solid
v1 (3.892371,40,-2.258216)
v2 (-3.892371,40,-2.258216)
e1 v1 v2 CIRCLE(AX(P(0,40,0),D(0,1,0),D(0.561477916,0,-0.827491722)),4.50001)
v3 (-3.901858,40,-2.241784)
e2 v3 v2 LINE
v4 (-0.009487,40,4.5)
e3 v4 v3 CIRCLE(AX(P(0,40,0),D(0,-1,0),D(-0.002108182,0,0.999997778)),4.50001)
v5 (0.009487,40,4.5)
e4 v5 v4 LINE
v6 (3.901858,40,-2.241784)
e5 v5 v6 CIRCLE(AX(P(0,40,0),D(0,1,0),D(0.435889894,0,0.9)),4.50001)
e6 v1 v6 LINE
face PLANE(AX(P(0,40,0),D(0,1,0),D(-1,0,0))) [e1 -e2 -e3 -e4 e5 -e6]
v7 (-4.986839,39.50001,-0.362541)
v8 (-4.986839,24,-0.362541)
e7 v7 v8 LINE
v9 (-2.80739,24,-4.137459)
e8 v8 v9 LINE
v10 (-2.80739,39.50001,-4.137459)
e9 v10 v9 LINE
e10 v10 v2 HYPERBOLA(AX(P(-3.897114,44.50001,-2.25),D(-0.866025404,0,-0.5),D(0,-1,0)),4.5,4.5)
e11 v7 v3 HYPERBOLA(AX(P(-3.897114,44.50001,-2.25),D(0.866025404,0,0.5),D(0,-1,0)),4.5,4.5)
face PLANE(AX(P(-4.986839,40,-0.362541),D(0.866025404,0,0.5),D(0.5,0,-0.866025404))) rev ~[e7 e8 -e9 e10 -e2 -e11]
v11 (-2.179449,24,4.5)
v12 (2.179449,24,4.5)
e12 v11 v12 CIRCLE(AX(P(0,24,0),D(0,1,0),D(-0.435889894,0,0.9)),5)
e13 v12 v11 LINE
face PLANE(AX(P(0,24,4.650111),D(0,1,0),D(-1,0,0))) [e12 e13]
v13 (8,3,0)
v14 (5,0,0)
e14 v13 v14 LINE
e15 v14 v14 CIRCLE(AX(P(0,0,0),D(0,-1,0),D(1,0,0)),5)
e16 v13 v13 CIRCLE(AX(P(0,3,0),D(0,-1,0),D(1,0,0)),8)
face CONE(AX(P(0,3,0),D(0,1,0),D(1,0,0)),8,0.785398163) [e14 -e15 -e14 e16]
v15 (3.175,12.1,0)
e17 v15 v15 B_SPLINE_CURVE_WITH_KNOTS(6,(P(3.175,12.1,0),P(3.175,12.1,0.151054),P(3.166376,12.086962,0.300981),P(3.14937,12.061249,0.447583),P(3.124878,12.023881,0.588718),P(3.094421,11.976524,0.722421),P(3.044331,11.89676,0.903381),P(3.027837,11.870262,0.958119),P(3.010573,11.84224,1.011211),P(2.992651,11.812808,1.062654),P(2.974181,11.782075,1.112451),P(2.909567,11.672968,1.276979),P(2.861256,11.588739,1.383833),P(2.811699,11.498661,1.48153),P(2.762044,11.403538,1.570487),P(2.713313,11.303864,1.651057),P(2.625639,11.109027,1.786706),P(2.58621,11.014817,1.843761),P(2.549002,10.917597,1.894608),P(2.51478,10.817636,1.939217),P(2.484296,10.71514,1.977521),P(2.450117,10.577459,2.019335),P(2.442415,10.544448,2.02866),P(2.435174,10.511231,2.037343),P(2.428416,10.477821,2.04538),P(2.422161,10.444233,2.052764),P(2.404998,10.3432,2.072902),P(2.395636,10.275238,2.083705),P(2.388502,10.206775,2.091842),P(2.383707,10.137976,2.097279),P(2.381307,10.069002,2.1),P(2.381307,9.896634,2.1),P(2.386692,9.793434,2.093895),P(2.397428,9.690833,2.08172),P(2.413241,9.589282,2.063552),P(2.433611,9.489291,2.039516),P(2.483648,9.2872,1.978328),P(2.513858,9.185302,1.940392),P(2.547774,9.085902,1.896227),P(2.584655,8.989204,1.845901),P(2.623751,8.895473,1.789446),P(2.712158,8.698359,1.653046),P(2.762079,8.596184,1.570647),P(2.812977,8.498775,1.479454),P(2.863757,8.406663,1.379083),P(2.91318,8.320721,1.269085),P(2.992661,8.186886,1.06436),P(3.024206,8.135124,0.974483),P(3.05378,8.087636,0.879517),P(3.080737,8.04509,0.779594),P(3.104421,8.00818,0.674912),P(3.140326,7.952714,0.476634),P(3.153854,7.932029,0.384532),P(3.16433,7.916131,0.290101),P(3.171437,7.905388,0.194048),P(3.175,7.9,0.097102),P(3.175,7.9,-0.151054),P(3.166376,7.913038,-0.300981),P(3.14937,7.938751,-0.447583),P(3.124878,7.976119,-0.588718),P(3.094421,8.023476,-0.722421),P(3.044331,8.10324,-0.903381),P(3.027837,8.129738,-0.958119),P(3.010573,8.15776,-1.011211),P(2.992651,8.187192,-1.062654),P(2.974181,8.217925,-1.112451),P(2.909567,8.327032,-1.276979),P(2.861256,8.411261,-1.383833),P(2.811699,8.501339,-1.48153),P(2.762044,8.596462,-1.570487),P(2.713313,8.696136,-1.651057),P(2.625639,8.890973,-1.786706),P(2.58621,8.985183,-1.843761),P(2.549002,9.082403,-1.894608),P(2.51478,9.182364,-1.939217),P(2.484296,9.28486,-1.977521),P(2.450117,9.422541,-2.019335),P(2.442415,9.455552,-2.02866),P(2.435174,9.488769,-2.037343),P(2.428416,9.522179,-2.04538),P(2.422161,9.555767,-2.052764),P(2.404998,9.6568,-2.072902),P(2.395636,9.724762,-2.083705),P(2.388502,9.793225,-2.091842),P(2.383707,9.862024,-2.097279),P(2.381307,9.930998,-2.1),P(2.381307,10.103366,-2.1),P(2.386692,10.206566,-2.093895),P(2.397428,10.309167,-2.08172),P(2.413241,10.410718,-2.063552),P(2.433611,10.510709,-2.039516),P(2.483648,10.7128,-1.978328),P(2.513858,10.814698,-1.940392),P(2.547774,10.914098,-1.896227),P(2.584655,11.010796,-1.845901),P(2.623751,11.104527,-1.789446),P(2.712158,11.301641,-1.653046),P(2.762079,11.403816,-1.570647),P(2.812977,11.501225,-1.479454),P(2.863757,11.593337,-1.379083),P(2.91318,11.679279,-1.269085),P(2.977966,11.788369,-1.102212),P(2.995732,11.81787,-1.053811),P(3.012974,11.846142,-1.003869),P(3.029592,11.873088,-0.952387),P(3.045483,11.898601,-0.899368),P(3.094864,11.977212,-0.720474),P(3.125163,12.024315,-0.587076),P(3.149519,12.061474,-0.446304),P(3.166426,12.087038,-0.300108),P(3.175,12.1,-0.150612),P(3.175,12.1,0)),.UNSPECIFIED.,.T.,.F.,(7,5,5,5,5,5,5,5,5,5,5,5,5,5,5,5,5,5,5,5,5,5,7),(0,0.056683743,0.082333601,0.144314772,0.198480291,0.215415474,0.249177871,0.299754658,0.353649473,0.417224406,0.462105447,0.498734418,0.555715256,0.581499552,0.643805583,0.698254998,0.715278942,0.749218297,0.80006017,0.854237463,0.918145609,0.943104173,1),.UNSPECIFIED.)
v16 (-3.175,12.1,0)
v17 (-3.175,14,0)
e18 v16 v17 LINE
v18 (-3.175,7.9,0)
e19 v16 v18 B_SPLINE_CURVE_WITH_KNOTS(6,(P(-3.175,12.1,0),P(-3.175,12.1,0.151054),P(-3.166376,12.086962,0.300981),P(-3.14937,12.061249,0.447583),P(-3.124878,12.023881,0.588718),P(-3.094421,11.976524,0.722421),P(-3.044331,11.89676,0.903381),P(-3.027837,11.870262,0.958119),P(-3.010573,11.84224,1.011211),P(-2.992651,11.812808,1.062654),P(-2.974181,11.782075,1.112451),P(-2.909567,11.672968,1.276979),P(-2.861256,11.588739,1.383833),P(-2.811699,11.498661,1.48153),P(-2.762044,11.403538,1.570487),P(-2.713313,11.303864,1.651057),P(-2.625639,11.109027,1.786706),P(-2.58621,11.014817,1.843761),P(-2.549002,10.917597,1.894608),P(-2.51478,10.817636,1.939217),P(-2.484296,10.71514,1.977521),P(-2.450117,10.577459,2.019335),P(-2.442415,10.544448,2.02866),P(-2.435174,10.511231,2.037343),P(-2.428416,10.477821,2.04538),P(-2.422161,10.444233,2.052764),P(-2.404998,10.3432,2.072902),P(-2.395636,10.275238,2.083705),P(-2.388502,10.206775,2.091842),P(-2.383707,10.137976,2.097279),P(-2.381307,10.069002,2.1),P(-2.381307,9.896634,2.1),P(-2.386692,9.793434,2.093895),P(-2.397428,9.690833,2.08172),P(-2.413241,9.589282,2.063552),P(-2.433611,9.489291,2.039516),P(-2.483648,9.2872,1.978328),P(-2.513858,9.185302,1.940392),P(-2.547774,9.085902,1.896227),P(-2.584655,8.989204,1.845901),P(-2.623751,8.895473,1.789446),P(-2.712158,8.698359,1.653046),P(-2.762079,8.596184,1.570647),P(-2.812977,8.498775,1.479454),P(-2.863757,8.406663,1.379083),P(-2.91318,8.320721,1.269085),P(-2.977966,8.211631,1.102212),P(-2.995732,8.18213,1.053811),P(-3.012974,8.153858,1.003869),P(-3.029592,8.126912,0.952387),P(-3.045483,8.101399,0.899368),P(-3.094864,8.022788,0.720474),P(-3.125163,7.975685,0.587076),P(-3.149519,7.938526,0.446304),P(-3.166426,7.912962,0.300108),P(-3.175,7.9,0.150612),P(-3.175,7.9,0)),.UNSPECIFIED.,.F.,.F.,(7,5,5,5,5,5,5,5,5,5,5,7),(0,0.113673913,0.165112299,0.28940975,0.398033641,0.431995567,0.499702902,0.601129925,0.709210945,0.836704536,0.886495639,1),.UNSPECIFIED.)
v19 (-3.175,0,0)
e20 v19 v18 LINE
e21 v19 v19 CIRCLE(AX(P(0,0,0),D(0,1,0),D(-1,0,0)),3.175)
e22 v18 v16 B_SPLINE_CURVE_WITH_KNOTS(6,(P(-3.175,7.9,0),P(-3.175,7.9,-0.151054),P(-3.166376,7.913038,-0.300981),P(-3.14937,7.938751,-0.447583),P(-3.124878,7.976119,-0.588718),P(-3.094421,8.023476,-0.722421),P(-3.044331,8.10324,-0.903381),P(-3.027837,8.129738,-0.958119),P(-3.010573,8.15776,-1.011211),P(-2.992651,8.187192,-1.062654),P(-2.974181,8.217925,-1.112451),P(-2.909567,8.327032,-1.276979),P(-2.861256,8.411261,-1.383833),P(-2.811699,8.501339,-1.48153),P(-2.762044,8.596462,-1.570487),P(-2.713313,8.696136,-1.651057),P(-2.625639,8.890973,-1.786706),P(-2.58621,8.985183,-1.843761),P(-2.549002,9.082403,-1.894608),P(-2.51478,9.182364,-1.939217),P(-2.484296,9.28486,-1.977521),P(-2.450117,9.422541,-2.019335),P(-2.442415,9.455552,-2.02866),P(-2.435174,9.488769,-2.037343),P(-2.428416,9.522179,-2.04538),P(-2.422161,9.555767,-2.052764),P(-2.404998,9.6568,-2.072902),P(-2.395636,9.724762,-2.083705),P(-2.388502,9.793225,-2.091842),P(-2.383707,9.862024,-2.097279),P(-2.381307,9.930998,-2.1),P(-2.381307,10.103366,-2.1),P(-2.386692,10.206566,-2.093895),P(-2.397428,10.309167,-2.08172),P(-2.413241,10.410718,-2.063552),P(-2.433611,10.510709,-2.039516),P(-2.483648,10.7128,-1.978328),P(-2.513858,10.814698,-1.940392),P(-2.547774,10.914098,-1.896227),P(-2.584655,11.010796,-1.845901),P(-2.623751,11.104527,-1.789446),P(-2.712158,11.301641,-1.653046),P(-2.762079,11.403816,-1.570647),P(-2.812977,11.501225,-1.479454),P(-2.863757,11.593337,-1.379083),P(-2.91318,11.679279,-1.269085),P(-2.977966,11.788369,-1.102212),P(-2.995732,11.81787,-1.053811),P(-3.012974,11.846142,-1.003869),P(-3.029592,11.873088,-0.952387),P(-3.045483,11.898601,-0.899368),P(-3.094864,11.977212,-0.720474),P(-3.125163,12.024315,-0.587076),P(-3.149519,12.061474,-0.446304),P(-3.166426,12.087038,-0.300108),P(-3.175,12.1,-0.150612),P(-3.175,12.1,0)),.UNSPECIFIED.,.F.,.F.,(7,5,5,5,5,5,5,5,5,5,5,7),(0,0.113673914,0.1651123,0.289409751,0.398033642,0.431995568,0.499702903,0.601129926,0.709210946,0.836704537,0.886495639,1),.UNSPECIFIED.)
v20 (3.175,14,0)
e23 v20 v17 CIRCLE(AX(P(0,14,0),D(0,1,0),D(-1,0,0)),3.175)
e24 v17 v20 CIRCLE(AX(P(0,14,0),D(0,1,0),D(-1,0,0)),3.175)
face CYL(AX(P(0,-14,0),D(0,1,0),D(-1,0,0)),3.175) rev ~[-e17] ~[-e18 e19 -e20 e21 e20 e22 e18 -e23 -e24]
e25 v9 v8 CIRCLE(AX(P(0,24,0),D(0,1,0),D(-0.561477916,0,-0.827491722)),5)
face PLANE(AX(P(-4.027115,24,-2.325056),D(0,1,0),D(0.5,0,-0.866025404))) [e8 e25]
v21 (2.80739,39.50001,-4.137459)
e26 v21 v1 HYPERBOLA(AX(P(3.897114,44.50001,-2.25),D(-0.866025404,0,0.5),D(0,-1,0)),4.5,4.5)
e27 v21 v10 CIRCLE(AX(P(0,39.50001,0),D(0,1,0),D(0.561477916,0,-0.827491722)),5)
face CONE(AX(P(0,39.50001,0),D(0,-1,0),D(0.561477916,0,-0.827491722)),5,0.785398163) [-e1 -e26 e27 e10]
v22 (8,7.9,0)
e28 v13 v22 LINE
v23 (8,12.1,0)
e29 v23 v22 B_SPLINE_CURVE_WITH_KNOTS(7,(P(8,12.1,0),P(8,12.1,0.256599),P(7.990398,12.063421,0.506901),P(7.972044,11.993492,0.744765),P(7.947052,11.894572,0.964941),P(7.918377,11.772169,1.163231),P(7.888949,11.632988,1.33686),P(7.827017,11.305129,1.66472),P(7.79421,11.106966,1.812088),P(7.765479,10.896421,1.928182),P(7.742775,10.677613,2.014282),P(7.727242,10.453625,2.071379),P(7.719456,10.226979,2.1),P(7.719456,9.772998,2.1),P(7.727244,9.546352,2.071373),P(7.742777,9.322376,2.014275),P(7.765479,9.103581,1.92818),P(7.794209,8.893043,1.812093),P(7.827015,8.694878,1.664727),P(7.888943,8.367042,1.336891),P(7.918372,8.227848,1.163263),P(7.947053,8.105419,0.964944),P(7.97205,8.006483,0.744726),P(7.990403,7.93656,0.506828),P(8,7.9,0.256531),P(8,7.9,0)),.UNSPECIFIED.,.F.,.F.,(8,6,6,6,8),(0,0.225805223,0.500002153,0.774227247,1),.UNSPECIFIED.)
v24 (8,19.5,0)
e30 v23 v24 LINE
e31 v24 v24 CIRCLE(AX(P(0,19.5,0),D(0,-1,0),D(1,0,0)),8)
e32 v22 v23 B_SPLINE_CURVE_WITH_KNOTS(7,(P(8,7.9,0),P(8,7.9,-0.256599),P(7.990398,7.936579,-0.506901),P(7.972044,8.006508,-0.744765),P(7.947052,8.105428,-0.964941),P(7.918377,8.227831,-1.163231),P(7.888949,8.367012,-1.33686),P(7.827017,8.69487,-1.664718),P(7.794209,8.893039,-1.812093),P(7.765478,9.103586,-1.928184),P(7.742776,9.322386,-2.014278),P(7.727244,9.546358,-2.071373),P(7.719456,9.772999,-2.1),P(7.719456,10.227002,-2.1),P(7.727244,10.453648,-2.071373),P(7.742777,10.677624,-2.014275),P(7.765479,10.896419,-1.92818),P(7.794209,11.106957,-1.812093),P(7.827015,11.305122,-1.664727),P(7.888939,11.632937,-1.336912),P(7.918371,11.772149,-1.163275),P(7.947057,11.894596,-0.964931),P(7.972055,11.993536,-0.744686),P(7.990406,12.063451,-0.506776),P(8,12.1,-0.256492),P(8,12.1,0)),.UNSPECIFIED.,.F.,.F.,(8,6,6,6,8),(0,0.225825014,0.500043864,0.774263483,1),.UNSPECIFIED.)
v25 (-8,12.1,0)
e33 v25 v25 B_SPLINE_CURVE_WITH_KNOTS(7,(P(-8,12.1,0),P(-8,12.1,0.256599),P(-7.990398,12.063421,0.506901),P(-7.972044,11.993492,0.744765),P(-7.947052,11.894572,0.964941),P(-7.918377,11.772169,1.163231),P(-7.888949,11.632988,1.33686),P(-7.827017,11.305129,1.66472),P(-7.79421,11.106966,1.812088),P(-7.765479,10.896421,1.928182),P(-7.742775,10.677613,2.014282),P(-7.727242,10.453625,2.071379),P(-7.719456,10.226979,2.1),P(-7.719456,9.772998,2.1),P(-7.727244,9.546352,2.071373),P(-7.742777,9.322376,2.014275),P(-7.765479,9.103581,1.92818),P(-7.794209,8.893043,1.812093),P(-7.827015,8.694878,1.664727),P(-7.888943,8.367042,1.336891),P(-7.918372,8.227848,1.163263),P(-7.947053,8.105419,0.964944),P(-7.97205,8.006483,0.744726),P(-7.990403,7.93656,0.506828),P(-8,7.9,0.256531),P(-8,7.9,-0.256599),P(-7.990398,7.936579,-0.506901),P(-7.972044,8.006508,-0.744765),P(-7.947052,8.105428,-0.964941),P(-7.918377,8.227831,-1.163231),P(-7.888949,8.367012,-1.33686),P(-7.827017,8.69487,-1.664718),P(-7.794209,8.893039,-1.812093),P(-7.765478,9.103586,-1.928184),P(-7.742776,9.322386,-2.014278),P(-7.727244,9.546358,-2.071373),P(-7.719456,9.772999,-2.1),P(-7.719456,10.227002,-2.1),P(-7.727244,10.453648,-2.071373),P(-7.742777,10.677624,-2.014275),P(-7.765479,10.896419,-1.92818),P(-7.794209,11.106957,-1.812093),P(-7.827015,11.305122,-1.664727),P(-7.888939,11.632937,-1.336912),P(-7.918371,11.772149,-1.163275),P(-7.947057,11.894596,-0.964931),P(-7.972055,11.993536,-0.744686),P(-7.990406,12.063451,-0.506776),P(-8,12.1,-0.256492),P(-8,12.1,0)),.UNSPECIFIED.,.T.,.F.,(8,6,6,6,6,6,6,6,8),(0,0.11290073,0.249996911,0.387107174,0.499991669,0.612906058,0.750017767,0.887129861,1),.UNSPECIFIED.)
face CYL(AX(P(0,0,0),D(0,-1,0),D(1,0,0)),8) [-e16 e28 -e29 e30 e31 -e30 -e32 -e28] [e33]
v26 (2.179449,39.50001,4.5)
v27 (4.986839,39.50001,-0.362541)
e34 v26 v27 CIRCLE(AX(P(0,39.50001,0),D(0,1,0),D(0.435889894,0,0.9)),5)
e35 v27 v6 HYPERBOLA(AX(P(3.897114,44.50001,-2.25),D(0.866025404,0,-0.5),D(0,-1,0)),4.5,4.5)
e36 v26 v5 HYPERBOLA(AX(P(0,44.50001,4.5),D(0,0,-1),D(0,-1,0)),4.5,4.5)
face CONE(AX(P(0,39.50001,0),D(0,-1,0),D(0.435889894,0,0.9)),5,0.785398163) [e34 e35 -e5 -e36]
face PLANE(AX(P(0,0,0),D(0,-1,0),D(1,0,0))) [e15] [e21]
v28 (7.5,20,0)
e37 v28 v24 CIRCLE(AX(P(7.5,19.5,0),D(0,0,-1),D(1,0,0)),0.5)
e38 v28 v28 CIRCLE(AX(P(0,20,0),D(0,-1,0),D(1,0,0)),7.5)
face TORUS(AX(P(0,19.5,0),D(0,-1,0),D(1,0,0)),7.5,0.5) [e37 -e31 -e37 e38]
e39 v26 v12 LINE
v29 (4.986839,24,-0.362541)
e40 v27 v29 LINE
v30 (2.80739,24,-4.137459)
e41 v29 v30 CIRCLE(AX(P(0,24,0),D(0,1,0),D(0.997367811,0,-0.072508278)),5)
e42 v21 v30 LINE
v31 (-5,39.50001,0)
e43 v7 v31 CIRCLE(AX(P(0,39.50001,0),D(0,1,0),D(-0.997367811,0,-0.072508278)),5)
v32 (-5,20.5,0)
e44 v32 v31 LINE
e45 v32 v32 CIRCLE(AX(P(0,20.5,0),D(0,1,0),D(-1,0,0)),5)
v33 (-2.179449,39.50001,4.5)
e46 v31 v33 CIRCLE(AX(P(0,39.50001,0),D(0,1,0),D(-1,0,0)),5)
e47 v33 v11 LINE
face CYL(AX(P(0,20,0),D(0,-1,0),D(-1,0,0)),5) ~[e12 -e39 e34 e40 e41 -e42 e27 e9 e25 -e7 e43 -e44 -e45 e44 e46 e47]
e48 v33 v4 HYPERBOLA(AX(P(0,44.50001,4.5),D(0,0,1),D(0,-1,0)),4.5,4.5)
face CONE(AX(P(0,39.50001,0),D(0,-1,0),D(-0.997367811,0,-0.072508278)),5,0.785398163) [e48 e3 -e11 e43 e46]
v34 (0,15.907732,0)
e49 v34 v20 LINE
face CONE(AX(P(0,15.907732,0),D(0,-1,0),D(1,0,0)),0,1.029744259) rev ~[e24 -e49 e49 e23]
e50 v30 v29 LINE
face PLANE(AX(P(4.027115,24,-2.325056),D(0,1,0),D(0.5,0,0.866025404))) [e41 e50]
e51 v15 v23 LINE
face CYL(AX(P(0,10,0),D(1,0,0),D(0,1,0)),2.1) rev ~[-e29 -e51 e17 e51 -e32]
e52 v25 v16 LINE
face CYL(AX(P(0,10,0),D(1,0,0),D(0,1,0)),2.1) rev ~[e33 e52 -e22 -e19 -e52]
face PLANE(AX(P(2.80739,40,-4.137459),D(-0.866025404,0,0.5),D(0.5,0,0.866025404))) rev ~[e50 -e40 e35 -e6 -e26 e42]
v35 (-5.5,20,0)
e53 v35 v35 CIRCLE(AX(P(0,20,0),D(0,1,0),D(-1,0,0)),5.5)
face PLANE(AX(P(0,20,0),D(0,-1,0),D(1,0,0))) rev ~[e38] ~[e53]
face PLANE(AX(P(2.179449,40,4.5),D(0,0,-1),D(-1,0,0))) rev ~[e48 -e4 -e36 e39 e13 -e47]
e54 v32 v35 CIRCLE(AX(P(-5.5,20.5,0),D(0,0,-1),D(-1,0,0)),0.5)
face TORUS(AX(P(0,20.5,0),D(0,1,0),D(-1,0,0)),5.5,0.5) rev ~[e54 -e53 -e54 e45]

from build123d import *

# Parameters (mm, degrees)
F0_R            = 8
F1_DEPTH        = 20
F2_R            = 5
F3_DEPTH        = 20
F5_DEPTH        = 16
F5_COPIES_COUNT = 3
F6_SIZE         = 0.49999
F7_R            = 0.5
F9_D            = 6.35
F9_DEPTH        = 14
F9_TIP          = 1.9077324654
F10_R           = 2.1
F11_DEPTH       = 8.25
F12_SIZE        = 3


# Not quite as in the source:
# - a fillet or chamfer is up to 0.001 mm smaller than in the source, because OpenCascade refuses the exact size
# - a pattern or mirror of a feature is missing from the dataset's text; its kind, count and spacing are read off the source's solid


with BuildPart() as f1:
    # F0 (on Front) → F1 (new body)
    with BuildSketch(Plane.XZ):
        Circle(F0_R)
    extrude(amount=-F1_DEPTH)

    # F2 (on face) → F3 (join)
    with BuildSketch(Plane(origin=(0, 20, 0), x_dir=(-1, 0, 0), z_dir=(0, 1, 0))):
        Circle(F2_R)
    extrude(amount=F3_DEPTH)

    # F4 (on face) → F5 (cut)
    with BuildSketch(Plane(origin=(0, 40, 0), x_dir=(-1, 0, 0), z_dir=(0, 1, 0))):
        with BuildLine():
            ThreePointArc((2.1794494718, 4.5), (0, 5), (-2.1794494718, 4.5))
            Line((-2.1794494718, 4.5), (2.1794494718, 4.5))
        make_face()
    f5 = extrude(amount=-F5_DEPTH, mode=Mode.SUBTRACT)

    # F5_copies: F5 ×3 about axis
    f5_copies_axis = Axis((0, 0, 0), (0, 1, 0))
    for i in range(1, F5_COPIES_COUNT):
        add(f5.rotate(f5_copies_axis, i * 360 / F5_COPIES_COUNT), mode=Mode.SUBTRACT)

    # F6 (size 0.5 in the source; OpenCascade refuses exactly that, so slightly less here)
    f6_edges = [f1.edges().sort_by_distance(p)[0] for p in [
        (4.330127, 40, 2.5),
        (-4.996709, 40, -0.18139),
        (0, 40, -5),
        (-4.236582, 40, 2.655443),
    ]]
    chamfer(f6_edges, length=F6_SIZE)

    # F7
    f7_edges = [f1.edges().sort_by_distance(p)[0] for p in [
        (-8, 20, 0),
        (5, 20, 0),
    ]]
    fillet(f7_edges, radius=F7_R)

    # F9
    with Locations(Plane.XZ):
        with Locations((0, 0)):
            Hole(F9_D / 2, depth=F9_DEPTH)
            with Locations((0, 0, -(F9_DEPTH + F9_TIP / 2))):  # 118° drill point
                Cone(0, F9_D / 2, F9_TIP, mode=Mode.SUBTRACT)

    # F10 (on Right) → F11 (cut, symmetric)
    with BuildSketch(Plane.YZ):
        with Locations((10, 0)):
            Circle(F10_R)
    extrude(amount=F11_DEPTH, both=True, mode=Mode.SUBTRACT)

    # F12
    f12_edges = [f1.edges().sort_by_distance(p)[0] for p in [
        (-8, 0, 0),
    ]]
    chamfer(f12_edges, length=F12_SIZE)


solid = f1.part
